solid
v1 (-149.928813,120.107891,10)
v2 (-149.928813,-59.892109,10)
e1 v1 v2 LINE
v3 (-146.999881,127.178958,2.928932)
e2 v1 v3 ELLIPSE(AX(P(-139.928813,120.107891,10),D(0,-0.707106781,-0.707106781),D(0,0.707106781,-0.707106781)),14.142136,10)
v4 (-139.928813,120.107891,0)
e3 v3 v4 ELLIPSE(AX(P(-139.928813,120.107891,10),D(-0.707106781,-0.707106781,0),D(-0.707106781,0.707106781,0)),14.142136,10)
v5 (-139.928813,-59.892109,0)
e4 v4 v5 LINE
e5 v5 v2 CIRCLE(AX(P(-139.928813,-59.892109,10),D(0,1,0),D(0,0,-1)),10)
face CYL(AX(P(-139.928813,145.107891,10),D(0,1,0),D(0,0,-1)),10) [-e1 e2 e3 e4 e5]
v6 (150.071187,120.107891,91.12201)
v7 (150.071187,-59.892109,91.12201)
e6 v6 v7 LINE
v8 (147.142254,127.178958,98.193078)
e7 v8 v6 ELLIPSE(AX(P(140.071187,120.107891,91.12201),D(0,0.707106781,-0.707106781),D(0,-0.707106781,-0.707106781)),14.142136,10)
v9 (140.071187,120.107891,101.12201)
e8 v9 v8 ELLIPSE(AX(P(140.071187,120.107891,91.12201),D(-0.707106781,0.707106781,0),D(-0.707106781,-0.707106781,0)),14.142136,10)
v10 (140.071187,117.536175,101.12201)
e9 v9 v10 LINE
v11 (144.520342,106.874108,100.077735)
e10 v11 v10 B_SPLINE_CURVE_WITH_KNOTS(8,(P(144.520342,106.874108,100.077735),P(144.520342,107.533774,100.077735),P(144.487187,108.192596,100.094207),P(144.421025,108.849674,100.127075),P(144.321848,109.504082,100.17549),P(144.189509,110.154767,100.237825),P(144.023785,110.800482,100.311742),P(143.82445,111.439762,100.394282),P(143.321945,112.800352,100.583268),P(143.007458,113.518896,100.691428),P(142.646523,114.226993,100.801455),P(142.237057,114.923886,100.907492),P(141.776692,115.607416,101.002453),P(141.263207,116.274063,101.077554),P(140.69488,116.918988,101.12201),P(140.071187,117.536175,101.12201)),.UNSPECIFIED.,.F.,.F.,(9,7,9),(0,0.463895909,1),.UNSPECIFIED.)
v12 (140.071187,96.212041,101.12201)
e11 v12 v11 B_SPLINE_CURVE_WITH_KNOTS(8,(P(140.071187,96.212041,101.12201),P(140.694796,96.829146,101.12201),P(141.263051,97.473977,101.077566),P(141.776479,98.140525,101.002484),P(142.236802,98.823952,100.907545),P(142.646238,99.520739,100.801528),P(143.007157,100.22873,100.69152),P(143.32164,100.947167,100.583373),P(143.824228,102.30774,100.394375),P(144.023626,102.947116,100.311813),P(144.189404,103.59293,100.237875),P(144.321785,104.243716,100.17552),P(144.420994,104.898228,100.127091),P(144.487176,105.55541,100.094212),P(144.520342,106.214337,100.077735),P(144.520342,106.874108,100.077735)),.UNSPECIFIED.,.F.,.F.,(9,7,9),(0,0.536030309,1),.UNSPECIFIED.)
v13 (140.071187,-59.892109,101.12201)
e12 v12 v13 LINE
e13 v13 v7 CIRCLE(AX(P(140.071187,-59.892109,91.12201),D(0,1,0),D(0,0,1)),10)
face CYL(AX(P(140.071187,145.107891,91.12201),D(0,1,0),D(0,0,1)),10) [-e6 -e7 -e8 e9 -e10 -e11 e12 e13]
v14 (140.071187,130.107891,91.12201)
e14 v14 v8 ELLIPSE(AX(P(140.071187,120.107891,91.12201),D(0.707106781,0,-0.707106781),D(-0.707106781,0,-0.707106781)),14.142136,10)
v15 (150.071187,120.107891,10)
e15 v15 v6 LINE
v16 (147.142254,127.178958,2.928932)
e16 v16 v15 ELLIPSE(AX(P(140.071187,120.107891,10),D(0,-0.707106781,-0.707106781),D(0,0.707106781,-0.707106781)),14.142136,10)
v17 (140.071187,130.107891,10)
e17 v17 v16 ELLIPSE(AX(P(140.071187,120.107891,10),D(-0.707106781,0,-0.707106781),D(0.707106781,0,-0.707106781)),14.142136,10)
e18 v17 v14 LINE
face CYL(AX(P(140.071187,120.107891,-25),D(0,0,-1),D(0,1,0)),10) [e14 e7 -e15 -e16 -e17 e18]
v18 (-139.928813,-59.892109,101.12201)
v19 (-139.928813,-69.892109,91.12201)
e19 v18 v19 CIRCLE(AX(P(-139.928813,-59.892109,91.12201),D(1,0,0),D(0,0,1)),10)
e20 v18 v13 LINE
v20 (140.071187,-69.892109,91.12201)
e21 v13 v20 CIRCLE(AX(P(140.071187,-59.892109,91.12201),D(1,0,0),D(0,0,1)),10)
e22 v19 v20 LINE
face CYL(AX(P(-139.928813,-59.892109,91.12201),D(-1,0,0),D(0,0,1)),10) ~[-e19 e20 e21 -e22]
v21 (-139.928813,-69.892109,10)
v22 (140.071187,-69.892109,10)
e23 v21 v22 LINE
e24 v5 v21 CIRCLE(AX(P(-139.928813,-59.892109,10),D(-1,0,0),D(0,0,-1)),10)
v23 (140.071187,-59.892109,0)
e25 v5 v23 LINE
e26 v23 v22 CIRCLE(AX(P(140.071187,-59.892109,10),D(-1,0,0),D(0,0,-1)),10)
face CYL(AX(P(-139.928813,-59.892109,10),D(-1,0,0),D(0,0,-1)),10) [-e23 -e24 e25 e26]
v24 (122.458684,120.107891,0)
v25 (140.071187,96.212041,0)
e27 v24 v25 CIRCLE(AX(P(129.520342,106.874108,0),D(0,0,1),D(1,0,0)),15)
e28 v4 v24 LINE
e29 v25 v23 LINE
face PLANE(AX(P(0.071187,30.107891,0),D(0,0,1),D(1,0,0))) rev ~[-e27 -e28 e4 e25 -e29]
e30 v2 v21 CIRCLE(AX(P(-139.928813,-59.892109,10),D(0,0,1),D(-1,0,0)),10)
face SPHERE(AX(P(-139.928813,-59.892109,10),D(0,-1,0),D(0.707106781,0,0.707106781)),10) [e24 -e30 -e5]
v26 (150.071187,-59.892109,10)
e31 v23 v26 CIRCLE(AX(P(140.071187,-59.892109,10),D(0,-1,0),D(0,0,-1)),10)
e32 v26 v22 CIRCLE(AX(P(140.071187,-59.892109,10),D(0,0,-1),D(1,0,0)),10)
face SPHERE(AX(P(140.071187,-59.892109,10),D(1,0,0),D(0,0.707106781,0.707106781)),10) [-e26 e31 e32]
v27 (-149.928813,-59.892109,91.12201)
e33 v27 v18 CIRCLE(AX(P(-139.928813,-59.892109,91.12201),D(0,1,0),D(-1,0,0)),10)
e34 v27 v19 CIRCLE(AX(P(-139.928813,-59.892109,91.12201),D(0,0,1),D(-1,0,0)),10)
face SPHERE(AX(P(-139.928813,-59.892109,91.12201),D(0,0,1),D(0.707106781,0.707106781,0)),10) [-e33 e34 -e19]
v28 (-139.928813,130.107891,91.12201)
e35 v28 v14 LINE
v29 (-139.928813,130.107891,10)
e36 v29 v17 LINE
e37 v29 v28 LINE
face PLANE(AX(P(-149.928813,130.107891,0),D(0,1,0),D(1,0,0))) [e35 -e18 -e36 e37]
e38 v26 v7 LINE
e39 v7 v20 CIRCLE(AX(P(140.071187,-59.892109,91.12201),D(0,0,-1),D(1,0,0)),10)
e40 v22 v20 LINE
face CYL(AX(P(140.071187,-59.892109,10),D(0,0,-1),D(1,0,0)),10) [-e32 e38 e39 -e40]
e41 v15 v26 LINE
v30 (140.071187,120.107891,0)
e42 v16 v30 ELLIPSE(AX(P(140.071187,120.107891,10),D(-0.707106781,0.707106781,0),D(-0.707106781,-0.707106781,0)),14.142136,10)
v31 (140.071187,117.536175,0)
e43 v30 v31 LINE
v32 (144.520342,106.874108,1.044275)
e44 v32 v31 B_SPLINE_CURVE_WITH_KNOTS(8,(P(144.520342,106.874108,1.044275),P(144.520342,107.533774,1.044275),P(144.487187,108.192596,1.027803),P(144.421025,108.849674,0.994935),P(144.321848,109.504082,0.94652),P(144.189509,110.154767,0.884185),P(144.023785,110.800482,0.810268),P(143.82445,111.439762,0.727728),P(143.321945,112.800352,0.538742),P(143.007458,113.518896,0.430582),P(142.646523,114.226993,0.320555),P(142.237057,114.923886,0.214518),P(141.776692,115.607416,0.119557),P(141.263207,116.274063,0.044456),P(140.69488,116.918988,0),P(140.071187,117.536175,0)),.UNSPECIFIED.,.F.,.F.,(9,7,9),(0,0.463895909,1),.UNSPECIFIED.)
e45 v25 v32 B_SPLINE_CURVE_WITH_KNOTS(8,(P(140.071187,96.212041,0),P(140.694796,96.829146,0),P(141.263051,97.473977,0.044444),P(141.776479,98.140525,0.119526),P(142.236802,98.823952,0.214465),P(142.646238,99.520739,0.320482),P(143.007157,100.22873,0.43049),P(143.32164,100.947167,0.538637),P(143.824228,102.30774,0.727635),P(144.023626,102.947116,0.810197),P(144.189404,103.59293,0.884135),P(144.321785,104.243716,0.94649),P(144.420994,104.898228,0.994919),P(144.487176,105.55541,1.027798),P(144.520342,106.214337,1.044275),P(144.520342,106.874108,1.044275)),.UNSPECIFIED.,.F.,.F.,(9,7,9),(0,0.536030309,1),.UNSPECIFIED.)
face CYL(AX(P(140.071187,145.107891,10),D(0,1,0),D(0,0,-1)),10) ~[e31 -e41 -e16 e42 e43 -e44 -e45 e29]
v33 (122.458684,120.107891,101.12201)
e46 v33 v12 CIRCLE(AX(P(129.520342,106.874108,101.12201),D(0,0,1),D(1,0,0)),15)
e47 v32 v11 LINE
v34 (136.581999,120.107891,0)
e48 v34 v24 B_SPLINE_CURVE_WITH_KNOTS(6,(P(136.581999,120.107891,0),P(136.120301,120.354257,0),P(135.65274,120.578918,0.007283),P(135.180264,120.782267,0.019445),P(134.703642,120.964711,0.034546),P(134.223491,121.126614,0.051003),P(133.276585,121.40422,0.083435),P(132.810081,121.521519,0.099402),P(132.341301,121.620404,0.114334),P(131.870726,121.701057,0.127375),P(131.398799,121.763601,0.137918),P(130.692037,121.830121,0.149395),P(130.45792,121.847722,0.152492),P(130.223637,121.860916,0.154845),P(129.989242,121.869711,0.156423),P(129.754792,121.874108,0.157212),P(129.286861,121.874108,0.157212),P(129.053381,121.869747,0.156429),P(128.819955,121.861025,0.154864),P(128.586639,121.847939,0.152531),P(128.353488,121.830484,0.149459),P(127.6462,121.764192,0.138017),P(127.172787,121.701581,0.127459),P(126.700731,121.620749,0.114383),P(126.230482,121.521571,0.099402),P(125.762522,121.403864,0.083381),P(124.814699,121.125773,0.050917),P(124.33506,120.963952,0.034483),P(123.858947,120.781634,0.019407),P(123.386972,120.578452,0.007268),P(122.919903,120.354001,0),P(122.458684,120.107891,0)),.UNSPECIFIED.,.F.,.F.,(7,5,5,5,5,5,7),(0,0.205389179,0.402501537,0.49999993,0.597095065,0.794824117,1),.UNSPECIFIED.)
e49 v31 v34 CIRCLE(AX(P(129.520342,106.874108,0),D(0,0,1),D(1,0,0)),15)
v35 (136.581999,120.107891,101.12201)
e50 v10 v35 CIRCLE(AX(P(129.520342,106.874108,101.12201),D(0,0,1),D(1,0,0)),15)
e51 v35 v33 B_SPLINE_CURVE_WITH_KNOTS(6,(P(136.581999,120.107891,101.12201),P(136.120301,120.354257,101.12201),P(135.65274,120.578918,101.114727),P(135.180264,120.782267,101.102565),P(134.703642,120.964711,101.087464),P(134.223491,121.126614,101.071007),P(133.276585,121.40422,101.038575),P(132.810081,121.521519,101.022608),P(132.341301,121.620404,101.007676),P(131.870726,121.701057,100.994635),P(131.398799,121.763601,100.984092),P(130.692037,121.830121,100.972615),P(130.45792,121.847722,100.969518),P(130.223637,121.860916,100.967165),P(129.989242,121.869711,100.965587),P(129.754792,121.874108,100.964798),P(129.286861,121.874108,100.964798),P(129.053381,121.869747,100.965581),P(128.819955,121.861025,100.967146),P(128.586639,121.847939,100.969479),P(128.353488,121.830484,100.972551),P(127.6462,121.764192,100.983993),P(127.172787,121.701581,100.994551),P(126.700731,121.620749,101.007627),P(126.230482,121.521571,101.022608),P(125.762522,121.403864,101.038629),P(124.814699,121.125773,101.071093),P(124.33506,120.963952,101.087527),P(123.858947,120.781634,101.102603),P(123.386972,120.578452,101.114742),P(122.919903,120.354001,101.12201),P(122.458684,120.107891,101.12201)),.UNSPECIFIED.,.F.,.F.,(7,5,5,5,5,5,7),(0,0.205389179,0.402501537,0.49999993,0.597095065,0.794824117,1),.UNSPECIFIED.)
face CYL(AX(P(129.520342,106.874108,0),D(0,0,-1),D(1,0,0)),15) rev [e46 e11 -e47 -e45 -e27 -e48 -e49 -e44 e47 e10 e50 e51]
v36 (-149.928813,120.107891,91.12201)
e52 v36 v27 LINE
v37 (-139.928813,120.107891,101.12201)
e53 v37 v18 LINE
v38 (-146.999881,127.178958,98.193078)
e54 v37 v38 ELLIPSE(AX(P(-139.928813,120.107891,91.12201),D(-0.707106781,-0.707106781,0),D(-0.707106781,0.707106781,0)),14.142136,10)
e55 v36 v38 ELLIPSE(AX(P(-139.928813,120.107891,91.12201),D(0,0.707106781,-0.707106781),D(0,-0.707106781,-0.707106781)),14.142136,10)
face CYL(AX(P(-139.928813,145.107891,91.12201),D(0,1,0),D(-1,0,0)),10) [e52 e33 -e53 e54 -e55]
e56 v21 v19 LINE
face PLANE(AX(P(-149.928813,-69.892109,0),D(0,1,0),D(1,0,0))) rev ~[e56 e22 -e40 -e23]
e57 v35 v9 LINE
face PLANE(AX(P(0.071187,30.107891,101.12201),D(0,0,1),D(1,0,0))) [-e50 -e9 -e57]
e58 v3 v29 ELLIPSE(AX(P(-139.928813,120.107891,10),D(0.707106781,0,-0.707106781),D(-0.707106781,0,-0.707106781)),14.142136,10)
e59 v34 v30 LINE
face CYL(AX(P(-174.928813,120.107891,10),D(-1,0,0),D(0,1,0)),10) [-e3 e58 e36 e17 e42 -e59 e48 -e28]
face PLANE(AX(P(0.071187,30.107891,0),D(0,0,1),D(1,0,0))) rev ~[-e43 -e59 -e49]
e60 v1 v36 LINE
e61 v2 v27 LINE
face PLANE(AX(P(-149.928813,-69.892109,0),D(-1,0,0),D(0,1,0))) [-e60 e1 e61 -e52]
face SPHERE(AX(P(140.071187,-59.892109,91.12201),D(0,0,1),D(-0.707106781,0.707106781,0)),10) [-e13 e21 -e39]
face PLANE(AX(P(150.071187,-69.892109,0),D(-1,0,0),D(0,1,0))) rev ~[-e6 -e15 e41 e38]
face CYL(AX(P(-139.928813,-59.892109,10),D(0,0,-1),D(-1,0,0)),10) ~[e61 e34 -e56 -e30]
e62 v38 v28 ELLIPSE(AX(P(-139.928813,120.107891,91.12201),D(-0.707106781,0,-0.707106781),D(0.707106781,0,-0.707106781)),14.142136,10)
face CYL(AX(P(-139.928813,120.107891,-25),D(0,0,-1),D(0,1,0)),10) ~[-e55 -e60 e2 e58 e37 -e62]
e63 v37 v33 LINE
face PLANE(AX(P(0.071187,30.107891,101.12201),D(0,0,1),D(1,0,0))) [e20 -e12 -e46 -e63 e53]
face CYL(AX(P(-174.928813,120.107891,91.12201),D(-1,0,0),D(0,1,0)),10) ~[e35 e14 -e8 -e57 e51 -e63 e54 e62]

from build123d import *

# Parameters (mm, degrees)
F0_W         = 300
F0_H         = 200
F0_R         = 15
F1_DEPTH     = 101.12201
F2_T1_DEPTH  = 151.12201
F2_T3_DEPTH  = 350
F3_T1_DEPTH  = 205
F3_T3_DEPTH  = 280
F3_T5_DEPTH  = 81.12201
F3_S9_W      = 10.2
F3_S9_H      = 10.2
F3_T10_DEPTH = 10.2
F3_S15_W     = 10.2
F3_S15_H     = 10.2
F3_T16_DEPTH = 10.2
F3_S21_W     = 10.2
F3_S21_H     = 10.2
F3_T22_DEPTH = 10.2
F3_S27_W     = 10.2
F3_S27_H     = 10.2
F3_T28_DEPTH = 10.2


# Not quite as in the source:
# - a fillet or chamfer that OpenCascade refuses, or shapes differently, is made with other operations: its cross-section is extruded or revolved along the edge and cut away or added


with BuildPart() as f1:
    # F0 (on Top) → F1 (new body)
    with BuildSketch(Plane.XY):
        with Locations((0.0711865723, 30.1078906848)):
            Rectangle(F0_W, F0_H)
        with Locations((129.520341754, 106.8741083145)):
            Circle(F0_R, mode=Mode.SUBTRACT)
    extrude(amount=F1_DEPTH)

    # F2: fillet of radius 10 on 4 edges, made by hand

    # F2_s2 → F2_t1 (cut)
    with BuildSketch(Plane.XY.offset(-25)):
        with BuildLine():
            ThreePointArc((-139.9288134277, 130.1078906848), (-146.9998812396, 127.1789584967), (-149.9288134277, 120.1078906848))
            Line((-149.9288134277, 120.1078906848), (-149.9288134277, 130.1078906848))
            Line((-149.9288134277, 130.1078906848), (-139.9288134277, 130.1078906848))
        make_face()
        with BuildLine():
            ThreePointArc((140.0711865723, 130.1078906848), (147.1422543842, 127.1789584967), (150.0711865723, 120.1078906848))
            Line((150.0711865723, 120.1078906848), (150.0711865723, 130.1078906848))
            Line((150.0711865723, 130.1078906848), (140.0711865723, 130.1078906848))
        make_face()
    extrude(amount=F2_T1_DEPTH, mode=Mode.SUBTRACT)

    # F2_s4 → F2_t3 (cut)
    with BuildSketch(Plane.YZ.offset(-174.9288134277)):
        with BuildLine():
            ThreePointArc((130.1078906848, 10), (127.1789584967, 2.9289321881), (120.1078906848, 0))
            Line((120.1078906848, 0), (130.1078906848, 0))
            Line((130.1078906848, 0), (130.1078906848, 10))
        make_face()
        with BuildLine():
            ThreePointArc((130.1078906848, 91.12201), (127.1789584967, 98.1930778119), (120.1078906848, 101.12201))
            Line((120.1078906848, 101.12201), (130.1078906848, 101.12201))
            Line((130.1078906848, 101.12201), (130.1078906848, 91.12201))
        make_face()
    extrude(amount=F2_T3_DEPTH, mode=Mode.SUBTRACT)

    # F3: fillet of radius 10 on 13 edges, made by hand

    # F3_s2 → F3_t1 (cut)
    with BuildSketch(Plane.XZ.offset(-145.1078906848)):
        with BuildLine():
            ThreePointArc((-139.9288134277, 0), (-146.9998812396, 2.9289321881), (-149.9288134277, 10))
            Line((-149.9288134277, 10), (-149.9288134277, 0))
            Line((-149.9288134277, 0), (-139.9288134277, 0))
        make_face()
        with BuildLine():
            ThreePointArc((140.0711865723, 0), (147.1422543842, 2.9289321881), (150.0711865723, 10))
            Line((150.0711865723, 10), (150.0711865723, 0))
            Line((150.0711865723, 0), (140.0711865723, 0))
        make_face()
        with BuildLine():
            ThreePointArc((140.0711865723, 101.12201), (147.1422543842, 98.1930778119), (150.0711865723, 91.12201))
            Line((150.0711865723, 91.12201), (150.0711865723, 101.12201))
            Line((150.0711865723, 101.12201), (140.0711865723, 101.12201))
        make_face()
        with BuildLine():
            ThreePointArc((-149.9288134277, 91.12201), (-146.9998812396, 98.1930778119), (-139.9288134277, 101.12201))
            Line((-139.9288134277, 101.12201), (-149.9288134277, 101.12201))
            Line((-149.9288134277, 101.12201), (-149.9288134277, 91.12201))
        make_face()
    extrude(amount=F3_T1_DEPTH, mode=Mode.SUBTRACT)

    # F3_s4 → F3_t3 (cut)
    with BuildSketch(Plane.YZ.offset(-139.9288134277)):
        with BuildLine():
            ThreePointArc((-59.8921093152, 0), (-66.963177127, 2.9289321881), (-69.8921093152, 10))
            Line((-69.8921093152, 10), (-69.8921093152, 0))
            Line((-69.8921093152, 0), (-59.8921093152, 0))
        make_face()
        with BuildLine():
            ThreePointArc((-59.8921093152, 101.12201), (-66.963177127, 98.1930778119), (-69.8921093152, 91.12201))
            Line((-69.8921093152, 91.12201), (-69.8921093152, 101.12201))
            Line((-69.8921093152, 101.12201), (-59.8921093152, 101.12201))
        make_face()
    extrude(amount=F3_T3_DEPTH, mode=Mode.SUBTRACT)

    # F3_s6 → F3_t5 (cut)
    with BuildSketch(Plane.XY.offset(10)):
        with BuildLine():
            ThreePointArc((-149.9288134277, -59.8921093152), (-146.9998812396, -66.963177127), (-139.9288134277, -69.8921093152))
            Line((-139.9288134277, -69.8921093152), (-149.9288134277, -69.8921093152))
            Line((-149.9288134277, -69.8921093152), (-149.9288134277, -59.8921093152))
        make_face()
        with BuildLine():
            ThreePointArc((150.0711865723, -59.8921093152), (147.1422543842, -66.963177127), (140.0711865723, -69.8921093152))
            Line((140.0711865723, -69.8921093152), (150.0711865723, -69.8921093152))
            Line((150.0711865723, -69.8921093152), (150.0711865723, -59.8921093152))
        make_face()
    extrude(amount=F3_T5_DEPTH, mode=Mode.SUBTRACT)


with BuildPart() as f3_tool8:
    # F3_s9 → F3_t10 (new body)
    with BuildSketch(Plane.XZ.offset(59.8921093152)):
        with Locations((-145.0288134277, 4.9)):
            Rectangle(F3_S9_W, F3_S9_H)
    extrude(amount=F3_T10_DEPTH)

    # F3_s11 → F3_t12 (revolve, cut)
    with BuildSketch(Plane(origin=(-139.9288134277, -59.8921093152, 10), x_dir=(0.7071067812, 0, 0.7071067812), z_dir=(0.7071067812, 0, -0.7071067812))):
        with BuildLine():
            ThreePointArc((0, -10), (10, 0), (0, 10))
            Line((0, 10), (0, -10))
        make_face()
    revolve(axis=Axis((-139.9288134277, -59.8921093152, 10), (0, -1, 0)), mode=Mode.SUBTRACT)


with BuildPart() as f1_1:
    add(f1.part)

    # F3_t7: cut F3_tool8
    add(f3_tool8.part, mode=Mode.SUBTRACT)


with BuildPart() as f3_tool14:
    # F3_s15 → F3_t16 (new body)
    with BuildSketch(Plane.YZ.offset(140.0711865723)):
        with Locations((-64.9921093152, 4.9)):
            Rectangle(F3_S15_W, F3_S15_H)
    extrude(amount=F3_T16_DEPTH)

    # F3_s17 → F3_t18 (revolve, cut)
    with BuildSketch(Plane(origin=(140.0711865723, -59.8921093152, 10), x_dir=(0, 0.7071067812, 0.7071067812), z_dir=(0, 0.7071067812, -0.7071067812))):
        with BuildLine():
            ThreePointArc((0, -10), (10, 0), (0, 10))
            Line((0, 10), (0, -10))
        make_face()
    revolve(axis=Axis((140.0711865723, -59.8921093152, 10), (1, 0, 0)), mode=Mode.SUBTRACT)


with BuildPart() as f1_2:
    add(f1_1.part)

    # F3_t13: cut F3_tool14
    add(f3_tool14.part, mode=Mode.SUBTRACT)


with BuildPart() as f3_tool20:
    # F3_s21 → F3_t22 (new body)
    with BuildSketch(Plane.XY.offset(91.12201)):
        with Locations((-145.0288134277, -64.9921093152)):
            Rectangle(F3_S21_W, F3_S21_H)
    extrude(amount=F3_T22_DEPTH)

    # F3_s23 → F3_t24 (revolve, cut)
    with BuildSketch(Plane(origin=(-139.9288134277, -59.8921093152, 91.12201), x_dir=(0.7071067812, 0.7071067812, 0), z_dir=(0.7071067812, -0.7071067812, 0))):
        with BuildLine():
            ThreePointArc((0, -10), (10, 0), (0, 10))
            Line((0, 10), (0, -10))
        make_face()
    revolve(axis=Axis((-139.9288134277, -59.8921093152, 91.12201), (0, 0, 1)), mode=Mode.SUBTRACT)


with BuildPart() as f1_3:
    add(f1_2.part)

    # F3_t19: cut F3_tool20
    add(f3_tool20.part, mode=Mode.SUBTRACT)


with BuildPart() as f3_tool26:
    # F3_s27 → F3_t28 (new body)
    with BuildSketch(Plane.XY.offset(91.12201)):
        with Locations((145.1711865723, -64.9921093152)):
            Rectangle(F3_S27_W, F3_S27_H)
    extrude(amount=F3_T28_DEPTH)

    # F3_s29 → F3_t30 (revolve, cut)
    with BuildSketch(Plane(origin=(140.0711865723, -59.8921093152, 91.12201), x_dir=(-0.7071067812, 0.7071067812, 0), z_dir=(0.7071067812, 0.7071067812, 0))):
        with BuildLine():
            ThreePointArc((0, -10), (10, 0), (0, 10))
            Line((0, 10), (0, -10))
        make_face()
    revolve(axis=Axis((140.0711865723, -59.8921093152, 91.12201), (0, 0, 1)), mode=Mode.SUBTRACT)


with BuildPart() as f1_4:
    add(f1_3.part)

    # F3_t25: cut F3_tool26
    add(f3_tool26.part, mode=Mode.SUBTRACT)


solid = f1_4.part
